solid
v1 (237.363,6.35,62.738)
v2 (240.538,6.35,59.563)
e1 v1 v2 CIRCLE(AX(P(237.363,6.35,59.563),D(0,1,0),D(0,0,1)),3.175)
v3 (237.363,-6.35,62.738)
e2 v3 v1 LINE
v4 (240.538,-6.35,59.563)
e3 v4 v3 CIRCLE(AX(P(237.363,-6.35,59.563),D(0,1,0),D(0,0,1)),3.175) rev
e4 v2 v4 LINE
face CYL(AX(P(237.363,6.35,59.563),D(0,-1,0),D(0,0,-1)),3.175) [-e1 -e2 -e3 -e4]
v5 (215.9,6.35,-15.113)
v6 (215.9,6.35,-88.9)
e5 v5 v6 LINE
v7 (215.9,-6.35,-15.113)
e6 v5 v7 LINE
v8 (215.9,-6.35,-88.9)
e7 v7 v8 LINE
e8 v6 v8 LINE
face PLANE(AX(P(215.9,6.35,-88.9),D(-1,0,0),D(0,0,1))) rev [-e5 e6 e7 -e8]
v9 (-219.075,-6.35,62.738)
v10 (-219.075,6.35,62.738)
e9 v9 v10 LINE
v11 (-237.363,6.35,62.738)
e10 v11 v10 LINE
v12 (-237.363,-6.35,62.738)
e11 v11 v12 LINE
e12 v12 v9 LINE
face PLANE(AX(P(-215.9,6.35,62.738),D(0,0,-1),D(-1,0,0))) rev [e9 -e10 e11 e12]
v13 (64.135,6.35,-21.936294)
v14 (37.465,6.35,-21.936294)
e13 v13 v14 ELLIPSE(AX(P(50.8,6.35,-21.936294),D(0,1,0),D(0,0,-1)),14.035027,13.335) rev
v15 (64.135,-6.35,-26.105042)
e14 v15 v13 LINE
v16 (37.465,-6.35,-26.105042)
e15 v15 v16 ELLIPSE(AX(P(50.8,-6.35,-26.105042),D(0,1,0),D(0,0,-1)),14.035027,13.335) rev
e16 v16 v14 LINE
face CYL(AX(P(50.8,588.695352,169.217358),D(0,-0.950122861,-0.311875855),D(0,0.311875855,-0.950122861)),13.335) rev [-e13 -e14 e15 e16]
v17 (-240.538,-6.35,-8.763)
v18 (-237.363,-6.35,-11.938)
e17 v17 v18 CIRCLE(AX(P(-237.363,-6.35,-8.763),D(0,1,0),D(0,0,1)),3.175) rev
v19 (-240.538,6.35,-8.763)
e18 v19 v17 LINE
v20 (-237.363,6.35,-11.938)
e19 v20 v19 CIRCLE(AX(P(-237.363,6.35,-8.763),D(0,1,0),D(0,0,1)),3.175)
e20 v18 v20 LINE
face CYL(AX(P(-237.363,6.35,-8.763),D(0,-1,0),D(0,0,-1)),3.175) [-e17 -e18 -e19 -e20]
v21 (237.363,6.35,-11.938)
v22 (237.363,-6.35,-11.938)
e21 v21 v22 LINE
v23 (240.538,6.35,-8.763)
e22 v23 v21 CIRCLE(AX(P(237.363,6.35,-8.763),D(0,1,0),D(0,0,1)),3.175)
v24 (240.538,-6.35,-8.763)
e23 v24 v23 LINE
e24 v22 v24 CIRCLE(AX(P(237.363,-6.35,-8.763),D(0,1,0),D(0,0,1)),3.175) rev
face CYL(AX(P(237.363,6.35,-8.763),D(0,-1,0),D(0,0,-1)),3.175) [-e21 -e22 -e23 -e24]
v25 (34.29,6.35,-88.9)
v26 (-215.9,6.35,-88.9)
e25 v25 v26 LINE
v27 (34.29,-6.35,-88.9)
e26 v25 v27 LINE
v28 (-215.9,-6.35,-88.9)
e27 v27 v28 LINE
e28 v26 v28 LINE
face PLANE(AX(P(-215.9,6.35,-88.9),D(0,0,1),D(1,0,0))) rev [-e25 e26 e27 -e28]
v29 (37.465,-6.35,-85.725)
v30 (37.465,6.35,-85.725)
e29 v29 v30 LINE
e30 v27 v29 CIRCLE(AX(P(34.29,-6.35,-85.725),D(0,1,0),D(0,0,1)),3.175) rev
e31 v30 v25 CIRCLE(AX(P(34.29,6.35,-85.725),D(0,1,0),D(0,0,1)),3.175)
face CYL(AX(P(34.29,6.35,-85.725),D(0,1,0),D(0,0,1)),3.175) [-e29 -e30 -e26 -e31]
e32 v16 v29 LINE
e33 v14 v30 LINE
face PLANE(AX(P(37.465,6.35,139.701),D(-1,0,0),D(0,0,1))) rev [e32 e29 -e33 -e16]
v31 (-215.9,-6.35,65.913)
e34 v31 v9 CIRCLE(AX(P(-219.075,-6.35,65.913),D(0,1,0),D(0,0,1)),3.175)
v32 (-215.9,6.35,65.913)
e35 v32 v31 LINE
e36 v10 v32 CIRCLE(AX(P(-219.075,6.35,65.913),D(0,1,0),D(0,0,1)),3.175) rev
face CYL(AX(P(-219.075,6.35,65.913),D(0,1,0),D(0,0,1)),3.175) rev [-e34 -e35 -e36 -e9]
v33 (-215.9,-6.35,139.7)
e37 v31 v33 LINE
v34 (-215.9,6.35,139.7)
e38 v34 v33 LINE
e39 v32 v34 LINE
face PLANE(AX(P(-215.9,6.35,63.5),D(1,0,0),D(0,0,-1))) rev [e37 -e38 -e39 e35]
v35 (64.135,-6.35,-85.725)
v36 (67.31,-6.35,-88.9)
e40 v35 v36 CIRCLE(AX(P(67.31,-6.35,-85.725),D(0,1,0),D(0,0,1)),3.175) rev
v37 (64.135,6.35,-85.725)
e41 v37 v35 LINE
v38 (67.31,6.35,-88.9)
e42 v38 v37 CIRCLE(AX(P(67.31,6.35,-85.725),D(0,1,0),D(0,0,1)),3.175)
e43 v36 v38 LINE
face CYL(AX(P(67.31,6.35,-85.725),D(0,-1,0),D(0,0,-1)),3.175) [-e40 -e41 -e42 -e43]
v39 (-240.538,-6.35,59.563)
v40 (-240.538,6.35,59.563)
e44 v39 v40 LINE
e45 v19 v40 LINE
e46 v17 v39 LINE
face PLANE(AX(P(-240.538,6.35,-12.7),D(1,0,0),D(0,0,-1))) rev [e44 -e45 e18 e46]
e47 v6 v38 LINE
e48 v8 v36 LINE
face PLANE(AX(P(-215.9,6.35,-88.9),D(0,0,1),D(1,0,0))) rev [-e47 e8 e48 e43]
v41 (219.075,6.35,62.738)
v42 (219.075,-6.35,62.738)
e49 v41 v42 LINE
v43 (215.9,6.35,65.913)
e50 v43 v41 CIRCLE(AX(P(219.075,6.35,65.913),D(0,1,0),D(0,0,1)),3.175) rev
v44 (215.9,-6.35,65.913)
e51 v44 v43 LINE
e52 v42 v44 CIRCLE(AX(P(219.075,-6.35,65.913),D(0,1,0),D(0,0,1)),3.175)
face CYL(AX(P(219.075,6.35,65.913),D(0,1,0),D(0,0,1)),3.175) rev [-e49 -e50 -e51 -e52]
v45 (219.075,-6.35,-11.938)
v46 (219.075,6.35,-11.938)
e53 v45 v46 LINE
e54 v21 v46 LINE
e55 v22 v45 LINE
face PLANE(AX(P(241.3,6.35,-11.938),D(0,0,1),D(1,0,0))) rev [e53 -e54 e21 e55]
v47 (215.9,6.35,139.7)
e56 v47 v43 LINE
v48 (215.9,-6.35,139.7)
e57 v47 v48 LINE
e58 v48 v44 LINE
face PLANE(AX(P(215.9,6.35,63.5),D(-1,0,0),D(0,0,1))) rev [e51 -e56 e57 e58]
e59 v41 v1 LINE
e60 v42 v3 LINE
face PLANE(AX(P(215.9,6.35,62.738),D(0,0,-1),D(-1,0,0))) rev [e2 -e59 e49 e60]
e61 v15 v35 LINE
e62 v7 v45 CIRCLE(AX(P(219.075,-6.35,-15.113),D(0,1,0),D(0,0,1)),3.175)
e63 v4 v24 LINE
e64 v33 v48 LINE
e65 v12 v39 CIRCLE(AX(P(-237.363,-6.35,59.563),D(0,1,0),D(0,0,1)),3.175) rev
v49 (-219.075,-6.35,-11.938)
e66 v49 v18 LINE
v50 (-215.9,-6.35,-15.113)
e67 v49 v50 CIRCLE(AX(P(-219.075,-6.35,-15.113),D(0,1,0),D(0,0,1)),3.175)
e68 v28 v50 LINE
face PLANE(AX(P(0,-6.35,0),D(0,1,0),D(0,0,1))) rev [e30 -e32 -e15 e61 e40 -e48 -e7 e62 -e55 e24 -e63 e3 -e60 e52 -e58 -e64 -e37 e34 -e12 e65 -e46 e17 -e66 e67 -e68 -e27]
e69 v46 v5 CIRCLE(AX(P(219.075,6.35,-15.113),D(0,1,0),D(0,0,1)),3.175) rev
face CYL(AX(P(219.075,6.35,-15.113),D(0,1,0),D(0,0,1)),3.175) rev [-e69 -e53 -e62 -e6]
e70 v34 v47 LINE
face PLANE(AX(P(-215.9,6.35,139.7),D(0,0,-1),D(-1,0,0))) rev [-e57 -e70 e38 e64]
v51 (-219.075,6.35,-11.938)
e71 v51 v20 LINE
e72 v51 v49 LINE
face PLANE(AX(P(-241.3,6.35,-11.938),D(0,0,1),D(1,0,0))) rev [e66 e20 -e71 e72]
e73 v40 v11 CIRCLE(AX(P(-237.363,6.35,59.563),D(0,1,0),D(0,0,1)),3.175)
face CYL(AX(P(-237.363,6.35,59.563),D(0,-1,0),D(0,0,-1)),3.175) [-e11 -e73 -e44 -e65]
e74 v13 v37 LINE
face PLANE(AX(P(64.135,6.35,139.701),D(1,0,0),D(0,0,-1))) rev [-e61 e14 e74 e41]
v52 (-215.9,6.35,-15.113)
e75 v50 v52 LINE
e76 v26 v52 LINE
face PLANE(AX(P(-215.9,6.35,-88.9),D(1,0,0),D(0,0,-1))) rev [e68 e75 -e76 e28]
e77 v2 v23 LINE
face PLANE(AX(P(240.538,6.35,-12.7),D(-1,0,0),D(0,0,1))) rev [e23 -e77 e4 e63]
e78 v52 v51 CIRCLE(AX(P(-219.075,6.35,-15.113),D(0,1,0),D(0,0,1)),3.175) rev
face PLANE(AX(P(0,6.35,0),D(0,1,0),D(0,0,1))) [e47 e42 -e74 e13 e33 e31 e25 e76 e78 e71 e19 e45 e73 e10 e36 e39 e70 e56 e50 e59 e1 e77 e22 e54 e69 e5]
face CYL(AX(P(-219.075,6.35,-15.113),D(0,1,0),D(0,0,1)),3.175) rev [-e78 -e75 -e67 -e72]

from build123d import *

# Parameters (mm, degrees)
BOSS_EXTRUDE1_DEPTH     = 6.35
CAVITY1_START           = -18.343561252
CAVITY1_OUTLINE_R       = 12.7
CAVITY1_DEPTH           = 21.704189785
CUT_EXTRUDE1_REACH      = 334.451
CUT_EXTRUDE1_END_RADIUS = 12.7
SKETCH4_W               = 25.4
SKETCH4_H               = 12.7
MOVE_FACE_SLOT_BY       = 0.762
MOVE_FACE_SLOT_2_BY     = 0.762
MOVE_FACE_SLOT_3_BY     = 0.762
MOVE_FACE_SLOT_4_BY     = 0.762
MOVE_FACE_SLOT_5_BY     = 0.762
MOVE_FACE_SLOT_6_BY     = 0.762
MOVE_START              = -33.759043645
MOVE_FACE_HOLE_DEPTH    = 37.328109508
FILLET1_R               = 3.175


# Read off the part's stored shape, not the designer's step: Cavity1, Move Face hole
with BuildPart() as part:
    # Sketch1 → Boss-Extrude1 (new, symmetric)
    with BuildSketch(Plane(origin=(0, 0, 0), x_dir=(1, 0, 0), z_dir=(0, 1, 0))):
        Polygon((-215.9, -139.7), (215.9, -139.7), (215.9, -63.5), (241.3, -63.5), (241.3, 12.7), (215.9, 12.7), (215.9, 88.9), (-215.9, 88.9), (-215.9, 12.7), (-241.3, 12.7), (-241.3, -63.5), (-215.9, -63.5), align=None)
    extrude(amount=BOSS_EXTRUDE1_DEPTH, both=True)

    # Cavity1 outline → Cavity1 (cut)
    with BuildSketch(Plane(origin=(0, 0, 0), x_dir=(1, 0, 0), z_dir=(0, 0.9501228611580828, 0.31187585463574896)).offset(CAVITY1_START)):
        with Locations((50.8, 22.822585801)):
            Circle(CAVITY1_OUTLINE_R)
    extrude(amount=CAVITY1_DEPTH, mode=Mode.SUBTRACT)

    # Cut-Extrude1: up to this cylinder (the profile starts outside it)
    cut_extrude1_end = Plane(origin=(50.8, -19.225068271, -30.3312567), z_dir=(0, -0.9501228611580824, -0.3118758546357494)) * Cylinder(CUT_EXTRUDE1_END_RADIUS, 695.302, mode=Mode.PRIVATE)
    # Sketch4 → Cut-Extrude1 (cut, up to the surface)
    with BuildSketch(Plane(origin=(0, 0, -88.9), x_dir=(-1, 0, 0), z_dir=(0, 0, -1)), mode=Mode.PRIVATE) as cut_extrude1_sk1:
        with Locations((-50.8, 0)):
            Rectangle(SKETCH4_W, SKETCH4_H)
    cut_extrude1_tool1 = extrude(cut_extrude1_sk1.sketch, amount=-CUT_EXTRUDE1_REACH, mode=Mode.PRIVATE) - cut_extrude1_end
    add(cut_extrude1_tool1.solids().sort_by_distance((50.8, 0, -88.9))[0], mode=Mode.SUBTRACT)

    # Move Face slot: a face moved inward by 0.762
    extrude(part.faces().sort_by_distance((228.6, 0, 63.5))[0], amount=MOVE_FACE_SLOT_BY, dir=(0, 0, -1), mode=Mode.SUBTRACT)

    # Move Face slot 2: a face moved inward by 0.762
    extrude(part.faces().sort_by_distance((228.6, 0, -12.7))[0], amount=MOVE_FACE_SLOT_2_BY, dir=(0, 0, 1), mode=Mode.SUBTRACT)

    # Move Face slot 3: a face moved inward by 0.762
    extrude(part.faces().sort_by_distance((241.3, 0, 25.4))[0], amount=MOVE_FACE_SLOT_3_BY, dir=(-1, 0, 0), mode=Mode.SUBTRACT)

    # Move Face slot 4: a face moved inward by 0.762
    extrude(part.faces().sort_by_distance((-228.6, 0, 63.5))[0], amount=MOVE_FACE_SLOT_4_BY, dir=(0, 0, -1), mode=Mode.SUBTRACT)

    # Move Face slot 5: a face moved inward by 0.762
    extrude(part.faces().sort_by_distance((-241.3, 0, 25.4))[0], amount=MOVE_FACE_SLOT_5_BY, dir=(1, 0, 0), mode=Mode.SUBTRACT)

    # Move Face slot 6: a face moved inward by 0.762
    extrude(part.faces().sort_by_distance((-228.6, 0, -12.7))[0], amount=MOVE_FACE_SLOT_6_BY, dir=(0, 0, 1), mode=Mode.SUBTRACT)

    # Move Face hole outline → Move Face hole (cut)
    with BuildSketch(Plane(origin=(0, 0, 0), x_dir=(1, 0, 0), z_dir=(0, 0.9501228611580828, 0.31187585463574896)).offset(MOVE_START)):
        with BuildLine():
            ThreePointArc((37.465, 22.822585801), (50.8, 9.487585801), (64.135, 22.822585801))
            Line((64.135, 22.822585801), (64.135, 88))
            Line((64.135, 88), (63.5, 88))
            Line((63.5, 88), (63.5, 22.822585801))
            ThreePointArc((63.5, 22.822585801), (50.8, 10.122585801), (38.1, 22.822585801))
            Line((38.1, 22.822585801), (38.1, 88))
            Line((38.1, 88), (37.465, 88))
            Line((37.465, 88), (37.465, 22.822585801))
        make_face()
    extrude(amount=MOVE_FACE_HOLE_DEPTH, mode=Mode.SUBTRACT)

    # Fillet1
    fillet1_edges = [part.edges().sort_by_distance(p)[0] for p in [
        (-215.9, 0, -11.938),
        (-240.538, 0, -11.938),
        (-240.538, 0, 62.738),
        (-215.9, 0, 62.738),
        (64.135, 0, -88.9),
        (37.465, 0, -88.9),
        (215.9, 0, 62.738),
        (240.538, 0, 62.738),
        (240.538, 0, -11.938),
        (215.9, 0, -11.938),
    ]]
    fillet(fillet1_edges, radius=FILLET1_R)


solid = part.part
